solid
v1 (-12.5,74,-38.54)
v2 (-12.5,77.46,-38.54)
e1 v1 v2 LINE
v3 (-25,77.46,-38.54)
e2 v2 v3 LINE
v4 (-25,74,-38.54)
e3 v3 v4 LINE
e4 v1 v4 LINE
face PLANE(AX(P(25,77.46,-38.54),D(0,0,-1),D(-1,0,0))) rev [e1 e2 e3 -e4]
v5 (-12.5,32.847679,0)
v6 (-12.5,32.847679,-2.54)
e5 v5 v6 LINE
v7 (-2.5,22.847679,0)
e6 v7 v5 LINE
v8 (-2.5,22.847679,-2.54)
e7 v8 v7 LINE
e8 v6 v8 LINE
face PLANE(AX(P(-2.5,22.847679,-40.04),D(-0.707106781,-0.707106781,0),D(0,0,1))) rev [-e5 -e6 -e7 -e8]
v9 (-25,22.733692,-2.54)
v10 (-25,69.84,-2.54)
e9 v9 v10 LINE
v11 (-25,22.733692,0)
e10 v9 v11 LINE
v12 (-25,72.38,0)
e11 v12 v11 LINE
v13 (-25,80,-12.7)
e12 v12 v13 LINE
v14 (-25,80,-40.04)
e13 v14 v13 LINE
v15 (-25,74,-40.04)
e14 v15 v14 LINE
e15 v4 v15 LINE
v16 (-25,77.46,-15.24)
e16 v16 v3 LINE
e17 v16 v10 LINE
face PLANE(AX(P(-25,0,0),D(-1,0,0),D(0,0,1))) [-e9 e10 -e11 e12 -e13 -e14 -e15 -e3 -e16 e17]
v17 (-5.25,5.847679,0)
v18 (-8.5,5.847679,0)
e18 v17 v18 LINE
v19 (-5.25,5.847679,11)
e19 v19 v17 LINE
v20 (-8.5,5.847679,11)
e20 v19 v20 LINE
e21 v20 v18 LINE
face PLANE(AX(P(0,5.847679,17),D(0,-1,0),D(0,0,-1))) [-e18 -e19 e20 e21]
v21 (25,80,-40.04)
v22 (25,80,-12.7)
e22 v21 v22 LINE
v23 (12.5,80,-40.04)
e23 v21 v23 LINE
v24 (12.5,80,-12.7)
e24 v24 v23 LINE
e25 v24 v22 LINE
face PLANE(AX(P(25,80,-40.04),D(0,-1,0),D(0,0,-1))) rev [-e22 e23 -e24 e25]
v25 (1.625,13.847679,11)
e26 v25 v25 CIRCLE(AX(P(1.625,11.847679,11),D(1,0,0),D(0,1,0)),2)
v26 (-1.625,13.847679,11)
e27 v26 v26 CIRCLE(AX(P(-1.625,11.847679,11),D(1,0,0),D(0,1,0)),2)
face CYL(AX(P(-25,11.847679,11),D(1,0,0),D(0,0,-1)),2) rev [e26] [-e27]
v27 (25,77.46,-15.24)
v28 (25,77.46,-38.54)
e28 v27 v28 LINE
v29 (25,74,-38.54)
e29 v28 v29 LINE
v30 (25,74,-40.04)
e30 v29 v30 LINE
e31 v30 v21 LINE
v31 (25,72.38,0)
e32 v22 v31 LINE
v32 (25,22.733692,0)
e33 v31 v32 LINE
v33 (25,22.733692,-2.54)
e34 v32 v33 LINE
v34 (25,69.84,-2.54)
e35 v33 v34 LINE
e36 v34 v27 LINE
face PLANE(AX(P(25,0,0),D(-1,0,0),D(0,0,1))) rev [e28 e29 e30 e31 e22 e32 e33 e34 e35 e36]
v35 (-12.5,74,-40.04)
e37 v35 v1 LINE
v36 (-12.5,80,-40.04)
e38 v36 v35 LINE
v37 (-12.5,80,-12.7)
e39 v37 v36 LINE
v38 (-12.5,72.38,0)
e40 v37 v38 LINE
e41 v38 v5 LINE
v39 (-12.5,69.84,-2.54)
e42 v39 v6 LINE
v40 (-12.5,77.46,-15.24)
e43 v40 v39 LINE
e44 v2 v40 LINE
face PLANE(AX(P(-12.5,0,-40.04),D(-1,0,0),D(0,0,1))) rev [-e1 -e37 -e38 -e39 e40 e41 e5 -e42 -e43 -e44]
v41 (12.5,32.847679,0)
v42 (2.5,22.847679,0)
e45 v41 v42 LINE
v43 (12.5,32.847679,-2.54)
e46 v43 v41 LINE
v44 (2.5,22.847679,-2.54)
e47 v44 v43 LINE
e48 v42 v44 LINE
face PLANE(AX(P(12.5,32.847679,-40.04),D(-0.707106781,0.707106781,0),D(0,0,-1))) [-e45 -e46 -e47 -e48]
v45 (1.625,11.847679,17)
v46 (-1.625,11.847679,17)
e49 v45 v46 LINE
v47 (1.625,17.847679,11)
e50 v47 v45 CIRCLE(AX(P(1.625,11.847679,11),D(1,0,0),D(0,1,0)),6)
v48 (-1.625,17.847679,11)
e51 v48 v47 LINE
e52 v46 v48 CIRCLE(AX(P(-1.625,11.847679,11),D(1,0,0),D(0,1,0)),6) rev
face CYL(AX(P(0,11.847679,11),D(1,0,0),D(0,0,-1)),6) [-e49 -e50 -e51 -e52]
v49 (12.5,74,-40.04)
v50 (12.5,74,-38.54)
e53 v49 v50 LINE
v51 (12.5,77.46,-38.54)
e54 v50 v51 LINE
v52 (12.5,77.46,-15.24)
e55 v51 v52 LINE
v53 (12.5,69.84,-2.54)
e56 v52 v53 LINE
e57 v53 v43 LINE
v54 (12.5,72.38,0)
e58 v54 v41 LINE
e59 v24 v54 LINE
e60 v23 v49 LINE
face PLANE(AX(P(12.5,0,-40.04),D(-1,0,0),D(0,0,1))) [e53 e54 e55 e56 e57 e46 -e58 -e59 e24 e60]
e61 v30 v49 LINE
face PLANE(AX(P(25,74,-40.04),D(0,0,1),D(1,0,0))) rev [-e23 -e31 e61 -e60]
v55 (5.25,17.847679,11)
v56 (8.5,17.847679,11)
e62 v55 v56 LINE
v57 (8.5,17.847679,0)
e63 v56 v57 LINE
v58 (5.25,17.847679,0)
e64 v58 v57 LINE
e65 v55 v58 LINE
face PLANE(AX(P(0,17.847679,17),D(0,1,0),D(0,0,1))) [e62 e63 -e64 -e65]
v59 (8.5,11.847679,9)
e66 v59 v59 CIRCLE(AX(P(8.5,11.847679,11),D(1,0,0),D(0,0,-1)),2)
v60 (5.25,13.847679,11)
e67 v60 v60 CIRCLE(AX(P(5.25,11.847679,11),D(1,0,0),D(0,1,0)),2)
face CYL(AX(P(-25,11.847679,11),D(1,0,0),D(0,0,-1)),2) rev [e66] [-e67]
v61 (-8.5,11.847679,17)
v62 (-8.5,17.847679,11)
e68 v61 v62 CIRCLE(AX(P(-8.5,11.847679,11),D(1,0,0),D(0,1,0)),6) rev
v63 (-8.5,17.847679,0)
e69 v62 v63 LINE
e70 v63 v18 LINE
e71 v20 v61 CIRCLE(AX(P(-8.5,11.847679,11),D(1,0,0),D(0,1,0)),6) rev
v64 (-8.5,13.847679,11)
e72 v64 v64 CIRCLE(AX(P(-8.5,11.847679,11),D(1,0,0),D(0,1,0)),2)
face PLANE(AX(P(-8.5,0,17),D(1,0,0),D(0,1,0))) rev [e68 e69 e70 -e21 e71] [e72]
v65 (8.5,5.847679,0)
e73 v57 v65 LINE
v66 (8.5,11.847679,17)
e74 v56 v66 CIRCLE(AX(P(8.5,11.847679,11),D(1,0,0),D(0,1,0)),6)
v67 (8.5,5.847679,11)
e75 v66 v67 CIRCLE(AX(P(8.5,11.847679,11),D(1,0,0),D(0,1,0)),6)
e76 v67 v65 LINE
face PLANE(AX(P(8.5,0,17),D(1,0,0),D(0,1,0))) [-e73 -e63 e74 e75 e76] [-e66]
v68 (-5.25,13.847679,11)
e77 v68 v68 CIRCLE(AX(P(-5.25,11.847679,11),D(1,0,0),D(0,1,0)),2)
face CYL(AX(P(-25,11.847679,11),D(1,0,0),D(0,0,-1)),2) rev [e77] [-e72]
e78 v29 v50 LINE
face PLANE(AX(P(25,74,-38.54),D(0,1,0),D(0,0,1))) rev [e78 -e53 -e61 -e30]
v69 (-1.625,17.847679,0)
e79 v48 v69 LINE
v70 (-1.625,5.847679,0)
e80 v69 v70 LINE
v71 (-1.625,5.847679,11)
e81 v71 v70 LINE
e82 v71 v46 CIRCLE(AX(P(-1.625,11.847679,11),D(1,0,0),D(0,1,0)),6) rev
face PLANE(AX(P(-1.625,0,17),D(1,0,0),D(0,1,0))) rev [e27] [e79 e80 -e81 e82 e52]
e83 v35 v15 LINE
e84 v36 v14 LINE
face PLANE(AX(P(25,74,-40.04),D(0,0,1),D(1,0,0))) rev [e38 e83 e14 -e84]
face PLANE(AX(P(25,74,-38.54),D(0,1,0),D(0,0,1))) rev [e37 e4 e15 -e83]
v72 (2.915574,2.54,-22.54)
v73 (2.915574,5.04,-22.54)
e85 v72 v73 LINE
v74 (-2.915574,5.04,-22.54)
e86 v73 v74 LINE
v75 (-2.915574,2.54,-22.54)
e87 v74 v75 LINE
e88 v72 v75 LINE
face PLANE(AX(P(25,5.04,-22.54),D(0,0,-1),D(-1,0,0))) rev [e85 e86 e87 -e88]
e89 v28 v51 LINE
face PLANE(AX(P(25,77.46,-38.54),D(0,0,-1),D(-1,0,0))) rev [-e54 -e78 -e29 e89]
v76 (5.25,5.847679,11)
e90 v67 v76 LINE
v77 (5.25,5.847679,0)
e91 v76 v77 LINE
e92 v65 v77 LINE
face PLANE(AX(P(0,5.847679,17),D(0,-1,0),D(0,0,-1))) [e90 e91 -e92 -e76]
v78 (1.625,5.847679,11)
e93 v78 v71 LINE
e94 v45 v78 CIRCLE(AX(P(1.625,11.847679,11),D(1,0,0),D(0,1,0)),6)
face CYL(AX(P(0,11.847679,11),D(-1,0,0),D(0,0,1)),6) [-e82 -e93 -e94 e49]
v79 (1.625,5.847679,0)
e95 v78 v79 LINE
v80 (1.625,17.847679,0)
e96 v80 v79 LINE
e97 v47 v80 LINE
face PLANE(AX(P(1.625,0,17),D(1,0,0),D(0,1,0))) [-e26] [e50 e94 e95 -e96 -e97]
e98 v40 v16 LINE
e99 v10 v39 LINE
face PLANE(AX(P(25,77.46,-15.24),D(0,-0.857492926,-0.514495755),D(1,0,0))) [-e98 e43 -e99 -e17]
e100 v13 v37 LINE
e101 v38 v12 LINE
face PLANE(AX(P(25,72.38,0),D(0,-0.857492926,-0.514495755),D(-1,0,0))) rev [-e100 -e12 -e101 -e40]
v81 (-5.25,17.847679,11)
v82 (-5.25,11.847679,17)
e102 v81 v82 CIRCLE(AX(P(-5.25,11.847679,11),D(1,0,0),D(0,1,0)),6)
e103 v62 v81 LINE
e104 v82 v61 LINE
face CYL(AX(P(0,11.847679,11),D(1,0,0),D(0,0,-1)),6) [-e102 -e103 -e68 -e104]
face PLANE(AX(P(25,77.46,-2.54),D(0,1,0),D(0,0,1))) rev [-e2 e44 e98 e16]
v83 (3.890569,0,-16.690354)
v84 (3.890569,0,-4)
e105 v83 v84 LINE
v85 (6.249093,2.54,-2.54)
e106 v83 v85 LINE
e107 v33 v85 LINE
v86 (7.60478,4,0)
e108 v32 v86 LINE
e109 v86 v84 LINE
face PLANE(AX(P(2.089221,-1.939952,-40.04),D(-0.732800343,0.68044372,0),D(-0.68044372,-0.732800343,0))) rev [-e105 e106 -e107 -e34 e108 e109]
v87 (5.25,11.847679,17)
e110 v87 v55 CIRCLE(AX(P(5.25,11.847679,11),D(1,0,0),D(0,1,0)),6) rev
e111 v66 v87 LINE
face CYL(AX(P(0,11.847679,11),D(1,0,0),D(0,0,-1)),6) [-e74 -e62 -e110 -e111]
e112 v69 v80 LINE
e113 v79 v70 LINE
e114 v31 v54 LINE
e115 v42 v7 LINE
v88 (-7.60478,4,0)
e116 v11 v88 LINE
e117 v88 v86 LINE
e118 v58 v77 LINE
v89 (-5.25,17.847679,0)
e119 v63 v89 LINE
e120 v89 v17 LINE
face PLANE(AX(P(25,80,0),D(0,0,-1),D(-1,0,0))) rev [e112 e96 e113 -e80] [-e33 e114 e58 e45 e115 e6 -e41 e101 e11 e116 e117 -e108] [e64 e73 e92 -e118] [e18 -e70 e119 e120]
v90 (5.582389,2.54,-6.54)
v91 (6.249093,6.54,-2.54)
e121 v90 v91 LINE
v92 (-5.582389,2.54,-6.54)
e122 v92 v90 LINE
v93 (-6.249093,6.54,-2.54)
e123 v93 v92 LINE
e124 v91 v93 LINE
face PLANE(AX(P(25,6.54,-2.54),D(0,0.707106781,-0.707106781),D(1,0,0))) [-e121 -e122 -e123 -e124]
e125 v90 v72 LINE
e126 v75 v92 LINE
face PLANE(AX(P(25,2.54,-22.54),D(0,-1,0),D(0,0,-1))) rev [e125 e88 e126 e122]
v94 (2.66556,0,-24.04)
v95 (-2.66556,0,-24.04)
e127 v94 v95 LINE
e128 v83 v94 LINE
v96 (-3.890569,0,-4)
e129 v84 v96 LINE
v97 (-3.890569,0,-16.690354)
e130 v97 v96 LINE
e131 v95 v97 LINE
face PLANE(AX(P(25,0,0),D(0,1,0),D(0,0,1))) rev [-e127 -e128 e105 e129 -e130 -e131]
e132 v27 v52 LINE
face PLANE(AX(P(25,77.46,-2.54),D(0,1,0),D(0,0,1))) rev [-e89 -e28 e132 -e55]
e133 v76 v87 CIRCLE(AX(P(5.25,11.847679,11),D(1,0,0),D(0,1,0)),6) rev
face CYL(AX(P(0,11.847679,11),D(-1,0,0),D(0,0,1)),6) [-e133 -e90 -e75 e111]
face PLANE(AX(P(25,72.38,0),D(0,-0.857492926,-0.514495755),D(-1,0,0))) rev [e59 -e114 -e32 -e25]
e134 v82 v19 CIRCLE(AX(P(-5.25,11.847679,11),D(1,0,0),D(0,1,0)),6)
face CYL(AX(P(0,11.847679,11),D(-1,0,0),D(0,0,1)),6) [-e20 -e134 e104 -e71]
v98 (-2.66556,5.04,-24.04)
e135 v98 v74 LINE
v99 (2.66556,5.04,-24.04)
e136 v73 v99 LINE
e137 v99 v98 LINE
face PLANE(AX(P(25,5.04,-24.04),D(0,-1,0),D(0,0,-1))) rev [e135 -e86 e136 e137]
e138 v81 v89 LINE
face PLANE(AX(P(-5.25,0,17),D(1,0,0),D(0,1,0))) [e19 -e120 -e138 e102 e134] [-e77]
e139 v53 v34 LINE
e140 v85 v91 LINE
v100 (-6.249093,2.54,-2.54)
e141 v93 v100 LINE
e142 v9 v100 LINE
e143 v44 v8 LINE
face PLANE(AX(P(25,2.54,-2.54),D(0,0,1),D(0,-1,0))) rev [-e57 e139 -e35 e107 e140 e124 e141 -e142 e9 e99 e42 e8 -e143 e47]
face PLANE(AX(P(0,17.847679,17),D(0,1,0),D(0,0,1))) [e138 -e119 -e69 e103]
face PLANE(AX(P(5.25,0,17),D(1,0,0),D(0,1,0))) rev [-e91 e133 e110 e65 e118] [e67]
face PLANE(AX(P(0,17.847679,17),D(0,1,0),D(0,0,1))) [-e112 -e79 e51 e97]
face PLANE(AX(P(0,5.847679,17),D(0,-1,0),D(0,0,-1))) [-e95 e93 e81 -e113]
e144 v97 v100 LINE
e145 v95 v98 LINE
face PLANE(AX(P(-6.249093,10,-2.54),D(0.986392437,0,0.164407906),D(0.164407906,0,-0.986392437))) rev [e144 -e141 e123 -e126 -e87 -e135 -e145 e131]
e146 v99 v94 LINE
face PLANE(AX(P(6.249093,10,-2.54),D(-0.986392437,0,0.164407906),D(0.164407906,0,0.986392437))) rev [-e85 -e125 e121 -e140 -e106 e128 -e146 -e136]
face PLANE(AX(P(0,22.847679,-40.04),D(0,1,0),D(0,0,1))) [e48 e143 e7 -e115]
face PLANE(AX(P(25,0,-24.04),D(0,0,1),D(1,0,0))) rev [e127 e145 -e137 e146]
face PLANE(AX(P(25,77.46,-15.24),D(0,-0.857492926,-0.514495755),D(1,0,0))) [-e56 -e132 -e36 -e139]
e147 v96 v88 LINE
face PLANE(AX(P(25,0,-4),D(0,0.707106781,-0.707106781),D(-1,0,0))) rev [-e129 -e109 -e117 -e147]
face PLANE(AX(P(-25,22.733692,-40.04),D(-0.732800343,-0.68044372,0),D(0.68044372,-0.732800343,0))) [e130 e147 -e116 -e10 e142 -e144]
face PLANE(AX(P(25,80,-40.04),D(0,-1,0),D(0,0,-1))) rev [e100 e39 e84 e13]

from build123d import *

# Parameters (mm, degrees)
BOSS_EXTRUDE1_DEPTH = 25
CHAMFER1_SIZE       = 7.62
CHAMFER1_SIZE2      = 12.7
CHAMFER2_SIZE       = 12.7
CHAMFER2_SIZE2      = 7.62
SKETCH2_W           = 12.5
SKETCH2_H           = 49.53232107
SKETCH2_H_2         = 15.55880868
CUT_EXTRUDE1_DEPTH  = 93.888113341
CHAMFER3_SIZE       = 10
CUT_EXTRUDE2_DEPTH  = 10
CHAMFER4_SIZE       = 4
SKETCH4_W           = 3.25
SKETCH4_H           = 12
SKETCH4_W_2         = 1.625
BOSS_EXTRUDE2_DEPTH = 17
FILLET1_R           = 6
SKETCH5_R           = 2
CUT_EXTRUDE3_DEPTH  = 96.527229626


# Some blends are built 0.0001 mm under size
with BuildPart() as part:
    # Sketch1 → Boss-Extrude1 (new, symmetric)
    with BuildSketch(Plane(origin=(0, 0, 0), x_dir=(0, 0, -1), z_dir=(1, 0, 0))):
        Polygon((2.54, 77.46), (38.54, 77.46), (38.54, 74), (40.04, 74), (40.04, 80), (0, 80), (0, 0), (24.04, 0), (24.04, 5.04), (22.54, 5.04), (22.54, 2.54), (2.54, 2.54), align=None)
    extrude(amount=BOSS_EXTRUDE1_DEPTH, both=True)

    # Chamfer1
    chamfer1_edges = [part.edges().sort_by_distance(p)[0] for p in [
        (0, 77.46, -2.54),
    ]]
    chamfer1_side = [part.faces().sort_by_distance(p)[0] for p in [
        (0, 40, -2.54),
    ]]
    chamfer(chamfer1_edges, length=CHAMFER1_SIZE, length2=CHAMFER1_SIZE2, reference=chamfer1_side[0])

    # Chamfer2
    chamfer2_edges = [part.edges().sort_by_distance(p)[0] for p in [
        (0, 80, 0),
    ]]
    chamfer2_side = [part.faces().sort_by_distance(p)[0] for p in [
        (0, 80, -20.02),
    ]]
    chamfer(chamfer2_edges, length=CHAMFER2_SIZE, length2=CHAMFER2_SIZE2, reference=chamfer2_side[0])

    # Sketch2 → Cut-Extrude1 (cut, through all)
    with BuildSketch(Plane.XY):
        Polygon((25, 0), (3.890569181, 0), (3.890569181, -6.225652432), (33.580070914, -6.225652432), (33.580070914, 22.733692281), (25, 22.733692281), align=None)
        Polygon((25, 22.733692281), (3.890569181, 0), (25, 0), align=None)
        with Locations((-6.25, 47.613839465)):
            Rectangle(SKETCH2_W, SKETCH2_H)
        with Locations((6.25, 47.613839465)):
            Rectangle(SKETCH2_W, SKETCH2_H)
        with Locations((6.25, 80.15940434)):
            Rectangle(SKETCH2_W, SKETCH2_H_2)
        with Locations((-6.25, 80.15940434)):
            Rectangle(SKETCH2_W, SKETCH2_H_2)
        Polygon((-33.580070914, 22.733692281), (-25, 22.733692281), (-3.890569181, 0), (-3.890569181, -6.225652432), (-33.580070914, -6.225652432), align=None)
    extrude(amount=-CUT_EXTRUDE1_DEPTH, mode=Mode.SUBTRACT)

    # Chamfer3
    chamfer3_edges = [part.edges().sort_by_distance(p)[0] for p in [
        (12.5, 22.84767893, -1.27),
        (-12.5, 22.84767893, -1.27),
    ]]
    chamfer(chamfer3_edges, length=CHAMFER3_SIZE)

    # Sketch3 → Cut-Extrude2 (cut)
    with BuildSketch(Plane.XZ):
        Polygon((6.24909298, -2.54), (2.09252957, -27.477990004), (-2.09252957, -27.477990004), (-6.24909298, -2.54), (-9.067628135, -2.54), (-9.067628135, -35.311562239), (9.067628135, -35.311562239), (9.067628135, -2.54), align=None)
    extrude(amount=-CUT_EXTRUDE2_DEPTH, mode=Mode.SUBTRACT)

    # Chamfer4
    # the kernel refuses this chamfer: 4 mm, written as the material it adds along each edge
    with BuildSketch(Plane(origin=(16.535824932, 2.54, -2.54), x_dir=(0, 0.9996219169112968, 0.027495876610586494), z_dir=(-1, 0, 0))) as chamfer4_piece_1_section:
        Polygon((CHAMFER4_SIZE * 0.999621916911, CHAMFER4_SIZE * 0.0274958766106), (-CHAMFER4_SIZE * 0.0274958766106, CHAMFER4_SIZE * 0.999621916911), (0, 0), align=None)
    chamfer4_piece_1 = extrude(amount=33.071649864, mode=Mode.PRIVATE)
    chamfer4_piece_1 = split(chamfer4_piece_1, bisect_by=Plane(origin=(-5.870802052, 3.874203196, -4.809619019), z_dir=(0.9863924373611449, 0, 0.16440790588271567)), keep=Keep.TOP, mode=Mode.PRIVATE)
    chamfer4_piece_1 = split(chamfer4_piece_1, bisect_by=Plane(origin=(5.870802052, 3.874203196, -4.809619019), z_dir=(-0.9863924373611449, 0, 0.16440790588271567)), keep=Keep.TOP, mode=Mode.PRIVATE)
    add(chamfer4_piece_1)
    # the kernel refuses this chamfer: 4 mm, written as the material it takes off along each edge
    with BuildSketch(Plane(origin=(-14.177301133, 0, 0), x_dir=(0, 0.9996219169112968, 0.027495876610586372), z_dir=(1, 0, 0))) as chamfer4_2_piece_1:
        Polygon((CHAMFER4_SIZE * 0.999621916911, -CHAMFER4_SIZE * 0.0274958766106), (-CHAMFER4_SIZE * 0.0274958766106, -CHAMFER4_SIZE * 0.999621916911), (0, 0), align=None)
    extrude(amount=28.354602266, mode=Mode.SUBTRACT)

    # Sketch4 → Boss-Extrude2 (add)
    with BuildSketch(Plane.XY):
        with Locations((-6.875, 11.84767893)):
            Rectangle(SKETCH4_W, SKETCH4_H)
        with Locations((0.8125, 11.84767893)):
            Rectangle(SKETCH4_W_2, SKETCH4_H)
        with Locations((-0.8125, 11.84767893)):
            Rectangle(SKETCH4_W_2, SKETCH4_H)
        with Locations((6.875, 11.84767893)):
            Rectangle(SKETCH4_W, SKETCH4_H)
    extrude(amount=BOSS_EXTRUDE2_DEPTH)

    # Fillet1
    fillet1_edges = [part.edges().sort_by_distance(p)[0] for p in [
        (-6.875, 5.84767893, 17),
        (0, 5.84767893, 17),
        (6.875, 5.84767893, 17),
        (6.875, 17.84767893, 17),
        (0, 17.84767893, 17),
        (-6.875, 17.84767893, 17),
    ]]
    fillet(fillet1_edges, radius=FILLET1_R - 0.0001)  # a hair under: the kernel refuses the full size

    # Sketch5 → Cut-Extrude3 (cut, through all)
    with BuildSketch(Plane(origin=(8.5, 0, 0), x_dir=(0, 0, -1), z_dir=(1, 0, 0))):
        with Locations((-11, 11.84767893)):
            Circle(SKETCH5_R)
    extrude(amount=-CUT_EXTRUDE3_DEPTH, mode=Mode.SUBTRACT)


solid = part.part
